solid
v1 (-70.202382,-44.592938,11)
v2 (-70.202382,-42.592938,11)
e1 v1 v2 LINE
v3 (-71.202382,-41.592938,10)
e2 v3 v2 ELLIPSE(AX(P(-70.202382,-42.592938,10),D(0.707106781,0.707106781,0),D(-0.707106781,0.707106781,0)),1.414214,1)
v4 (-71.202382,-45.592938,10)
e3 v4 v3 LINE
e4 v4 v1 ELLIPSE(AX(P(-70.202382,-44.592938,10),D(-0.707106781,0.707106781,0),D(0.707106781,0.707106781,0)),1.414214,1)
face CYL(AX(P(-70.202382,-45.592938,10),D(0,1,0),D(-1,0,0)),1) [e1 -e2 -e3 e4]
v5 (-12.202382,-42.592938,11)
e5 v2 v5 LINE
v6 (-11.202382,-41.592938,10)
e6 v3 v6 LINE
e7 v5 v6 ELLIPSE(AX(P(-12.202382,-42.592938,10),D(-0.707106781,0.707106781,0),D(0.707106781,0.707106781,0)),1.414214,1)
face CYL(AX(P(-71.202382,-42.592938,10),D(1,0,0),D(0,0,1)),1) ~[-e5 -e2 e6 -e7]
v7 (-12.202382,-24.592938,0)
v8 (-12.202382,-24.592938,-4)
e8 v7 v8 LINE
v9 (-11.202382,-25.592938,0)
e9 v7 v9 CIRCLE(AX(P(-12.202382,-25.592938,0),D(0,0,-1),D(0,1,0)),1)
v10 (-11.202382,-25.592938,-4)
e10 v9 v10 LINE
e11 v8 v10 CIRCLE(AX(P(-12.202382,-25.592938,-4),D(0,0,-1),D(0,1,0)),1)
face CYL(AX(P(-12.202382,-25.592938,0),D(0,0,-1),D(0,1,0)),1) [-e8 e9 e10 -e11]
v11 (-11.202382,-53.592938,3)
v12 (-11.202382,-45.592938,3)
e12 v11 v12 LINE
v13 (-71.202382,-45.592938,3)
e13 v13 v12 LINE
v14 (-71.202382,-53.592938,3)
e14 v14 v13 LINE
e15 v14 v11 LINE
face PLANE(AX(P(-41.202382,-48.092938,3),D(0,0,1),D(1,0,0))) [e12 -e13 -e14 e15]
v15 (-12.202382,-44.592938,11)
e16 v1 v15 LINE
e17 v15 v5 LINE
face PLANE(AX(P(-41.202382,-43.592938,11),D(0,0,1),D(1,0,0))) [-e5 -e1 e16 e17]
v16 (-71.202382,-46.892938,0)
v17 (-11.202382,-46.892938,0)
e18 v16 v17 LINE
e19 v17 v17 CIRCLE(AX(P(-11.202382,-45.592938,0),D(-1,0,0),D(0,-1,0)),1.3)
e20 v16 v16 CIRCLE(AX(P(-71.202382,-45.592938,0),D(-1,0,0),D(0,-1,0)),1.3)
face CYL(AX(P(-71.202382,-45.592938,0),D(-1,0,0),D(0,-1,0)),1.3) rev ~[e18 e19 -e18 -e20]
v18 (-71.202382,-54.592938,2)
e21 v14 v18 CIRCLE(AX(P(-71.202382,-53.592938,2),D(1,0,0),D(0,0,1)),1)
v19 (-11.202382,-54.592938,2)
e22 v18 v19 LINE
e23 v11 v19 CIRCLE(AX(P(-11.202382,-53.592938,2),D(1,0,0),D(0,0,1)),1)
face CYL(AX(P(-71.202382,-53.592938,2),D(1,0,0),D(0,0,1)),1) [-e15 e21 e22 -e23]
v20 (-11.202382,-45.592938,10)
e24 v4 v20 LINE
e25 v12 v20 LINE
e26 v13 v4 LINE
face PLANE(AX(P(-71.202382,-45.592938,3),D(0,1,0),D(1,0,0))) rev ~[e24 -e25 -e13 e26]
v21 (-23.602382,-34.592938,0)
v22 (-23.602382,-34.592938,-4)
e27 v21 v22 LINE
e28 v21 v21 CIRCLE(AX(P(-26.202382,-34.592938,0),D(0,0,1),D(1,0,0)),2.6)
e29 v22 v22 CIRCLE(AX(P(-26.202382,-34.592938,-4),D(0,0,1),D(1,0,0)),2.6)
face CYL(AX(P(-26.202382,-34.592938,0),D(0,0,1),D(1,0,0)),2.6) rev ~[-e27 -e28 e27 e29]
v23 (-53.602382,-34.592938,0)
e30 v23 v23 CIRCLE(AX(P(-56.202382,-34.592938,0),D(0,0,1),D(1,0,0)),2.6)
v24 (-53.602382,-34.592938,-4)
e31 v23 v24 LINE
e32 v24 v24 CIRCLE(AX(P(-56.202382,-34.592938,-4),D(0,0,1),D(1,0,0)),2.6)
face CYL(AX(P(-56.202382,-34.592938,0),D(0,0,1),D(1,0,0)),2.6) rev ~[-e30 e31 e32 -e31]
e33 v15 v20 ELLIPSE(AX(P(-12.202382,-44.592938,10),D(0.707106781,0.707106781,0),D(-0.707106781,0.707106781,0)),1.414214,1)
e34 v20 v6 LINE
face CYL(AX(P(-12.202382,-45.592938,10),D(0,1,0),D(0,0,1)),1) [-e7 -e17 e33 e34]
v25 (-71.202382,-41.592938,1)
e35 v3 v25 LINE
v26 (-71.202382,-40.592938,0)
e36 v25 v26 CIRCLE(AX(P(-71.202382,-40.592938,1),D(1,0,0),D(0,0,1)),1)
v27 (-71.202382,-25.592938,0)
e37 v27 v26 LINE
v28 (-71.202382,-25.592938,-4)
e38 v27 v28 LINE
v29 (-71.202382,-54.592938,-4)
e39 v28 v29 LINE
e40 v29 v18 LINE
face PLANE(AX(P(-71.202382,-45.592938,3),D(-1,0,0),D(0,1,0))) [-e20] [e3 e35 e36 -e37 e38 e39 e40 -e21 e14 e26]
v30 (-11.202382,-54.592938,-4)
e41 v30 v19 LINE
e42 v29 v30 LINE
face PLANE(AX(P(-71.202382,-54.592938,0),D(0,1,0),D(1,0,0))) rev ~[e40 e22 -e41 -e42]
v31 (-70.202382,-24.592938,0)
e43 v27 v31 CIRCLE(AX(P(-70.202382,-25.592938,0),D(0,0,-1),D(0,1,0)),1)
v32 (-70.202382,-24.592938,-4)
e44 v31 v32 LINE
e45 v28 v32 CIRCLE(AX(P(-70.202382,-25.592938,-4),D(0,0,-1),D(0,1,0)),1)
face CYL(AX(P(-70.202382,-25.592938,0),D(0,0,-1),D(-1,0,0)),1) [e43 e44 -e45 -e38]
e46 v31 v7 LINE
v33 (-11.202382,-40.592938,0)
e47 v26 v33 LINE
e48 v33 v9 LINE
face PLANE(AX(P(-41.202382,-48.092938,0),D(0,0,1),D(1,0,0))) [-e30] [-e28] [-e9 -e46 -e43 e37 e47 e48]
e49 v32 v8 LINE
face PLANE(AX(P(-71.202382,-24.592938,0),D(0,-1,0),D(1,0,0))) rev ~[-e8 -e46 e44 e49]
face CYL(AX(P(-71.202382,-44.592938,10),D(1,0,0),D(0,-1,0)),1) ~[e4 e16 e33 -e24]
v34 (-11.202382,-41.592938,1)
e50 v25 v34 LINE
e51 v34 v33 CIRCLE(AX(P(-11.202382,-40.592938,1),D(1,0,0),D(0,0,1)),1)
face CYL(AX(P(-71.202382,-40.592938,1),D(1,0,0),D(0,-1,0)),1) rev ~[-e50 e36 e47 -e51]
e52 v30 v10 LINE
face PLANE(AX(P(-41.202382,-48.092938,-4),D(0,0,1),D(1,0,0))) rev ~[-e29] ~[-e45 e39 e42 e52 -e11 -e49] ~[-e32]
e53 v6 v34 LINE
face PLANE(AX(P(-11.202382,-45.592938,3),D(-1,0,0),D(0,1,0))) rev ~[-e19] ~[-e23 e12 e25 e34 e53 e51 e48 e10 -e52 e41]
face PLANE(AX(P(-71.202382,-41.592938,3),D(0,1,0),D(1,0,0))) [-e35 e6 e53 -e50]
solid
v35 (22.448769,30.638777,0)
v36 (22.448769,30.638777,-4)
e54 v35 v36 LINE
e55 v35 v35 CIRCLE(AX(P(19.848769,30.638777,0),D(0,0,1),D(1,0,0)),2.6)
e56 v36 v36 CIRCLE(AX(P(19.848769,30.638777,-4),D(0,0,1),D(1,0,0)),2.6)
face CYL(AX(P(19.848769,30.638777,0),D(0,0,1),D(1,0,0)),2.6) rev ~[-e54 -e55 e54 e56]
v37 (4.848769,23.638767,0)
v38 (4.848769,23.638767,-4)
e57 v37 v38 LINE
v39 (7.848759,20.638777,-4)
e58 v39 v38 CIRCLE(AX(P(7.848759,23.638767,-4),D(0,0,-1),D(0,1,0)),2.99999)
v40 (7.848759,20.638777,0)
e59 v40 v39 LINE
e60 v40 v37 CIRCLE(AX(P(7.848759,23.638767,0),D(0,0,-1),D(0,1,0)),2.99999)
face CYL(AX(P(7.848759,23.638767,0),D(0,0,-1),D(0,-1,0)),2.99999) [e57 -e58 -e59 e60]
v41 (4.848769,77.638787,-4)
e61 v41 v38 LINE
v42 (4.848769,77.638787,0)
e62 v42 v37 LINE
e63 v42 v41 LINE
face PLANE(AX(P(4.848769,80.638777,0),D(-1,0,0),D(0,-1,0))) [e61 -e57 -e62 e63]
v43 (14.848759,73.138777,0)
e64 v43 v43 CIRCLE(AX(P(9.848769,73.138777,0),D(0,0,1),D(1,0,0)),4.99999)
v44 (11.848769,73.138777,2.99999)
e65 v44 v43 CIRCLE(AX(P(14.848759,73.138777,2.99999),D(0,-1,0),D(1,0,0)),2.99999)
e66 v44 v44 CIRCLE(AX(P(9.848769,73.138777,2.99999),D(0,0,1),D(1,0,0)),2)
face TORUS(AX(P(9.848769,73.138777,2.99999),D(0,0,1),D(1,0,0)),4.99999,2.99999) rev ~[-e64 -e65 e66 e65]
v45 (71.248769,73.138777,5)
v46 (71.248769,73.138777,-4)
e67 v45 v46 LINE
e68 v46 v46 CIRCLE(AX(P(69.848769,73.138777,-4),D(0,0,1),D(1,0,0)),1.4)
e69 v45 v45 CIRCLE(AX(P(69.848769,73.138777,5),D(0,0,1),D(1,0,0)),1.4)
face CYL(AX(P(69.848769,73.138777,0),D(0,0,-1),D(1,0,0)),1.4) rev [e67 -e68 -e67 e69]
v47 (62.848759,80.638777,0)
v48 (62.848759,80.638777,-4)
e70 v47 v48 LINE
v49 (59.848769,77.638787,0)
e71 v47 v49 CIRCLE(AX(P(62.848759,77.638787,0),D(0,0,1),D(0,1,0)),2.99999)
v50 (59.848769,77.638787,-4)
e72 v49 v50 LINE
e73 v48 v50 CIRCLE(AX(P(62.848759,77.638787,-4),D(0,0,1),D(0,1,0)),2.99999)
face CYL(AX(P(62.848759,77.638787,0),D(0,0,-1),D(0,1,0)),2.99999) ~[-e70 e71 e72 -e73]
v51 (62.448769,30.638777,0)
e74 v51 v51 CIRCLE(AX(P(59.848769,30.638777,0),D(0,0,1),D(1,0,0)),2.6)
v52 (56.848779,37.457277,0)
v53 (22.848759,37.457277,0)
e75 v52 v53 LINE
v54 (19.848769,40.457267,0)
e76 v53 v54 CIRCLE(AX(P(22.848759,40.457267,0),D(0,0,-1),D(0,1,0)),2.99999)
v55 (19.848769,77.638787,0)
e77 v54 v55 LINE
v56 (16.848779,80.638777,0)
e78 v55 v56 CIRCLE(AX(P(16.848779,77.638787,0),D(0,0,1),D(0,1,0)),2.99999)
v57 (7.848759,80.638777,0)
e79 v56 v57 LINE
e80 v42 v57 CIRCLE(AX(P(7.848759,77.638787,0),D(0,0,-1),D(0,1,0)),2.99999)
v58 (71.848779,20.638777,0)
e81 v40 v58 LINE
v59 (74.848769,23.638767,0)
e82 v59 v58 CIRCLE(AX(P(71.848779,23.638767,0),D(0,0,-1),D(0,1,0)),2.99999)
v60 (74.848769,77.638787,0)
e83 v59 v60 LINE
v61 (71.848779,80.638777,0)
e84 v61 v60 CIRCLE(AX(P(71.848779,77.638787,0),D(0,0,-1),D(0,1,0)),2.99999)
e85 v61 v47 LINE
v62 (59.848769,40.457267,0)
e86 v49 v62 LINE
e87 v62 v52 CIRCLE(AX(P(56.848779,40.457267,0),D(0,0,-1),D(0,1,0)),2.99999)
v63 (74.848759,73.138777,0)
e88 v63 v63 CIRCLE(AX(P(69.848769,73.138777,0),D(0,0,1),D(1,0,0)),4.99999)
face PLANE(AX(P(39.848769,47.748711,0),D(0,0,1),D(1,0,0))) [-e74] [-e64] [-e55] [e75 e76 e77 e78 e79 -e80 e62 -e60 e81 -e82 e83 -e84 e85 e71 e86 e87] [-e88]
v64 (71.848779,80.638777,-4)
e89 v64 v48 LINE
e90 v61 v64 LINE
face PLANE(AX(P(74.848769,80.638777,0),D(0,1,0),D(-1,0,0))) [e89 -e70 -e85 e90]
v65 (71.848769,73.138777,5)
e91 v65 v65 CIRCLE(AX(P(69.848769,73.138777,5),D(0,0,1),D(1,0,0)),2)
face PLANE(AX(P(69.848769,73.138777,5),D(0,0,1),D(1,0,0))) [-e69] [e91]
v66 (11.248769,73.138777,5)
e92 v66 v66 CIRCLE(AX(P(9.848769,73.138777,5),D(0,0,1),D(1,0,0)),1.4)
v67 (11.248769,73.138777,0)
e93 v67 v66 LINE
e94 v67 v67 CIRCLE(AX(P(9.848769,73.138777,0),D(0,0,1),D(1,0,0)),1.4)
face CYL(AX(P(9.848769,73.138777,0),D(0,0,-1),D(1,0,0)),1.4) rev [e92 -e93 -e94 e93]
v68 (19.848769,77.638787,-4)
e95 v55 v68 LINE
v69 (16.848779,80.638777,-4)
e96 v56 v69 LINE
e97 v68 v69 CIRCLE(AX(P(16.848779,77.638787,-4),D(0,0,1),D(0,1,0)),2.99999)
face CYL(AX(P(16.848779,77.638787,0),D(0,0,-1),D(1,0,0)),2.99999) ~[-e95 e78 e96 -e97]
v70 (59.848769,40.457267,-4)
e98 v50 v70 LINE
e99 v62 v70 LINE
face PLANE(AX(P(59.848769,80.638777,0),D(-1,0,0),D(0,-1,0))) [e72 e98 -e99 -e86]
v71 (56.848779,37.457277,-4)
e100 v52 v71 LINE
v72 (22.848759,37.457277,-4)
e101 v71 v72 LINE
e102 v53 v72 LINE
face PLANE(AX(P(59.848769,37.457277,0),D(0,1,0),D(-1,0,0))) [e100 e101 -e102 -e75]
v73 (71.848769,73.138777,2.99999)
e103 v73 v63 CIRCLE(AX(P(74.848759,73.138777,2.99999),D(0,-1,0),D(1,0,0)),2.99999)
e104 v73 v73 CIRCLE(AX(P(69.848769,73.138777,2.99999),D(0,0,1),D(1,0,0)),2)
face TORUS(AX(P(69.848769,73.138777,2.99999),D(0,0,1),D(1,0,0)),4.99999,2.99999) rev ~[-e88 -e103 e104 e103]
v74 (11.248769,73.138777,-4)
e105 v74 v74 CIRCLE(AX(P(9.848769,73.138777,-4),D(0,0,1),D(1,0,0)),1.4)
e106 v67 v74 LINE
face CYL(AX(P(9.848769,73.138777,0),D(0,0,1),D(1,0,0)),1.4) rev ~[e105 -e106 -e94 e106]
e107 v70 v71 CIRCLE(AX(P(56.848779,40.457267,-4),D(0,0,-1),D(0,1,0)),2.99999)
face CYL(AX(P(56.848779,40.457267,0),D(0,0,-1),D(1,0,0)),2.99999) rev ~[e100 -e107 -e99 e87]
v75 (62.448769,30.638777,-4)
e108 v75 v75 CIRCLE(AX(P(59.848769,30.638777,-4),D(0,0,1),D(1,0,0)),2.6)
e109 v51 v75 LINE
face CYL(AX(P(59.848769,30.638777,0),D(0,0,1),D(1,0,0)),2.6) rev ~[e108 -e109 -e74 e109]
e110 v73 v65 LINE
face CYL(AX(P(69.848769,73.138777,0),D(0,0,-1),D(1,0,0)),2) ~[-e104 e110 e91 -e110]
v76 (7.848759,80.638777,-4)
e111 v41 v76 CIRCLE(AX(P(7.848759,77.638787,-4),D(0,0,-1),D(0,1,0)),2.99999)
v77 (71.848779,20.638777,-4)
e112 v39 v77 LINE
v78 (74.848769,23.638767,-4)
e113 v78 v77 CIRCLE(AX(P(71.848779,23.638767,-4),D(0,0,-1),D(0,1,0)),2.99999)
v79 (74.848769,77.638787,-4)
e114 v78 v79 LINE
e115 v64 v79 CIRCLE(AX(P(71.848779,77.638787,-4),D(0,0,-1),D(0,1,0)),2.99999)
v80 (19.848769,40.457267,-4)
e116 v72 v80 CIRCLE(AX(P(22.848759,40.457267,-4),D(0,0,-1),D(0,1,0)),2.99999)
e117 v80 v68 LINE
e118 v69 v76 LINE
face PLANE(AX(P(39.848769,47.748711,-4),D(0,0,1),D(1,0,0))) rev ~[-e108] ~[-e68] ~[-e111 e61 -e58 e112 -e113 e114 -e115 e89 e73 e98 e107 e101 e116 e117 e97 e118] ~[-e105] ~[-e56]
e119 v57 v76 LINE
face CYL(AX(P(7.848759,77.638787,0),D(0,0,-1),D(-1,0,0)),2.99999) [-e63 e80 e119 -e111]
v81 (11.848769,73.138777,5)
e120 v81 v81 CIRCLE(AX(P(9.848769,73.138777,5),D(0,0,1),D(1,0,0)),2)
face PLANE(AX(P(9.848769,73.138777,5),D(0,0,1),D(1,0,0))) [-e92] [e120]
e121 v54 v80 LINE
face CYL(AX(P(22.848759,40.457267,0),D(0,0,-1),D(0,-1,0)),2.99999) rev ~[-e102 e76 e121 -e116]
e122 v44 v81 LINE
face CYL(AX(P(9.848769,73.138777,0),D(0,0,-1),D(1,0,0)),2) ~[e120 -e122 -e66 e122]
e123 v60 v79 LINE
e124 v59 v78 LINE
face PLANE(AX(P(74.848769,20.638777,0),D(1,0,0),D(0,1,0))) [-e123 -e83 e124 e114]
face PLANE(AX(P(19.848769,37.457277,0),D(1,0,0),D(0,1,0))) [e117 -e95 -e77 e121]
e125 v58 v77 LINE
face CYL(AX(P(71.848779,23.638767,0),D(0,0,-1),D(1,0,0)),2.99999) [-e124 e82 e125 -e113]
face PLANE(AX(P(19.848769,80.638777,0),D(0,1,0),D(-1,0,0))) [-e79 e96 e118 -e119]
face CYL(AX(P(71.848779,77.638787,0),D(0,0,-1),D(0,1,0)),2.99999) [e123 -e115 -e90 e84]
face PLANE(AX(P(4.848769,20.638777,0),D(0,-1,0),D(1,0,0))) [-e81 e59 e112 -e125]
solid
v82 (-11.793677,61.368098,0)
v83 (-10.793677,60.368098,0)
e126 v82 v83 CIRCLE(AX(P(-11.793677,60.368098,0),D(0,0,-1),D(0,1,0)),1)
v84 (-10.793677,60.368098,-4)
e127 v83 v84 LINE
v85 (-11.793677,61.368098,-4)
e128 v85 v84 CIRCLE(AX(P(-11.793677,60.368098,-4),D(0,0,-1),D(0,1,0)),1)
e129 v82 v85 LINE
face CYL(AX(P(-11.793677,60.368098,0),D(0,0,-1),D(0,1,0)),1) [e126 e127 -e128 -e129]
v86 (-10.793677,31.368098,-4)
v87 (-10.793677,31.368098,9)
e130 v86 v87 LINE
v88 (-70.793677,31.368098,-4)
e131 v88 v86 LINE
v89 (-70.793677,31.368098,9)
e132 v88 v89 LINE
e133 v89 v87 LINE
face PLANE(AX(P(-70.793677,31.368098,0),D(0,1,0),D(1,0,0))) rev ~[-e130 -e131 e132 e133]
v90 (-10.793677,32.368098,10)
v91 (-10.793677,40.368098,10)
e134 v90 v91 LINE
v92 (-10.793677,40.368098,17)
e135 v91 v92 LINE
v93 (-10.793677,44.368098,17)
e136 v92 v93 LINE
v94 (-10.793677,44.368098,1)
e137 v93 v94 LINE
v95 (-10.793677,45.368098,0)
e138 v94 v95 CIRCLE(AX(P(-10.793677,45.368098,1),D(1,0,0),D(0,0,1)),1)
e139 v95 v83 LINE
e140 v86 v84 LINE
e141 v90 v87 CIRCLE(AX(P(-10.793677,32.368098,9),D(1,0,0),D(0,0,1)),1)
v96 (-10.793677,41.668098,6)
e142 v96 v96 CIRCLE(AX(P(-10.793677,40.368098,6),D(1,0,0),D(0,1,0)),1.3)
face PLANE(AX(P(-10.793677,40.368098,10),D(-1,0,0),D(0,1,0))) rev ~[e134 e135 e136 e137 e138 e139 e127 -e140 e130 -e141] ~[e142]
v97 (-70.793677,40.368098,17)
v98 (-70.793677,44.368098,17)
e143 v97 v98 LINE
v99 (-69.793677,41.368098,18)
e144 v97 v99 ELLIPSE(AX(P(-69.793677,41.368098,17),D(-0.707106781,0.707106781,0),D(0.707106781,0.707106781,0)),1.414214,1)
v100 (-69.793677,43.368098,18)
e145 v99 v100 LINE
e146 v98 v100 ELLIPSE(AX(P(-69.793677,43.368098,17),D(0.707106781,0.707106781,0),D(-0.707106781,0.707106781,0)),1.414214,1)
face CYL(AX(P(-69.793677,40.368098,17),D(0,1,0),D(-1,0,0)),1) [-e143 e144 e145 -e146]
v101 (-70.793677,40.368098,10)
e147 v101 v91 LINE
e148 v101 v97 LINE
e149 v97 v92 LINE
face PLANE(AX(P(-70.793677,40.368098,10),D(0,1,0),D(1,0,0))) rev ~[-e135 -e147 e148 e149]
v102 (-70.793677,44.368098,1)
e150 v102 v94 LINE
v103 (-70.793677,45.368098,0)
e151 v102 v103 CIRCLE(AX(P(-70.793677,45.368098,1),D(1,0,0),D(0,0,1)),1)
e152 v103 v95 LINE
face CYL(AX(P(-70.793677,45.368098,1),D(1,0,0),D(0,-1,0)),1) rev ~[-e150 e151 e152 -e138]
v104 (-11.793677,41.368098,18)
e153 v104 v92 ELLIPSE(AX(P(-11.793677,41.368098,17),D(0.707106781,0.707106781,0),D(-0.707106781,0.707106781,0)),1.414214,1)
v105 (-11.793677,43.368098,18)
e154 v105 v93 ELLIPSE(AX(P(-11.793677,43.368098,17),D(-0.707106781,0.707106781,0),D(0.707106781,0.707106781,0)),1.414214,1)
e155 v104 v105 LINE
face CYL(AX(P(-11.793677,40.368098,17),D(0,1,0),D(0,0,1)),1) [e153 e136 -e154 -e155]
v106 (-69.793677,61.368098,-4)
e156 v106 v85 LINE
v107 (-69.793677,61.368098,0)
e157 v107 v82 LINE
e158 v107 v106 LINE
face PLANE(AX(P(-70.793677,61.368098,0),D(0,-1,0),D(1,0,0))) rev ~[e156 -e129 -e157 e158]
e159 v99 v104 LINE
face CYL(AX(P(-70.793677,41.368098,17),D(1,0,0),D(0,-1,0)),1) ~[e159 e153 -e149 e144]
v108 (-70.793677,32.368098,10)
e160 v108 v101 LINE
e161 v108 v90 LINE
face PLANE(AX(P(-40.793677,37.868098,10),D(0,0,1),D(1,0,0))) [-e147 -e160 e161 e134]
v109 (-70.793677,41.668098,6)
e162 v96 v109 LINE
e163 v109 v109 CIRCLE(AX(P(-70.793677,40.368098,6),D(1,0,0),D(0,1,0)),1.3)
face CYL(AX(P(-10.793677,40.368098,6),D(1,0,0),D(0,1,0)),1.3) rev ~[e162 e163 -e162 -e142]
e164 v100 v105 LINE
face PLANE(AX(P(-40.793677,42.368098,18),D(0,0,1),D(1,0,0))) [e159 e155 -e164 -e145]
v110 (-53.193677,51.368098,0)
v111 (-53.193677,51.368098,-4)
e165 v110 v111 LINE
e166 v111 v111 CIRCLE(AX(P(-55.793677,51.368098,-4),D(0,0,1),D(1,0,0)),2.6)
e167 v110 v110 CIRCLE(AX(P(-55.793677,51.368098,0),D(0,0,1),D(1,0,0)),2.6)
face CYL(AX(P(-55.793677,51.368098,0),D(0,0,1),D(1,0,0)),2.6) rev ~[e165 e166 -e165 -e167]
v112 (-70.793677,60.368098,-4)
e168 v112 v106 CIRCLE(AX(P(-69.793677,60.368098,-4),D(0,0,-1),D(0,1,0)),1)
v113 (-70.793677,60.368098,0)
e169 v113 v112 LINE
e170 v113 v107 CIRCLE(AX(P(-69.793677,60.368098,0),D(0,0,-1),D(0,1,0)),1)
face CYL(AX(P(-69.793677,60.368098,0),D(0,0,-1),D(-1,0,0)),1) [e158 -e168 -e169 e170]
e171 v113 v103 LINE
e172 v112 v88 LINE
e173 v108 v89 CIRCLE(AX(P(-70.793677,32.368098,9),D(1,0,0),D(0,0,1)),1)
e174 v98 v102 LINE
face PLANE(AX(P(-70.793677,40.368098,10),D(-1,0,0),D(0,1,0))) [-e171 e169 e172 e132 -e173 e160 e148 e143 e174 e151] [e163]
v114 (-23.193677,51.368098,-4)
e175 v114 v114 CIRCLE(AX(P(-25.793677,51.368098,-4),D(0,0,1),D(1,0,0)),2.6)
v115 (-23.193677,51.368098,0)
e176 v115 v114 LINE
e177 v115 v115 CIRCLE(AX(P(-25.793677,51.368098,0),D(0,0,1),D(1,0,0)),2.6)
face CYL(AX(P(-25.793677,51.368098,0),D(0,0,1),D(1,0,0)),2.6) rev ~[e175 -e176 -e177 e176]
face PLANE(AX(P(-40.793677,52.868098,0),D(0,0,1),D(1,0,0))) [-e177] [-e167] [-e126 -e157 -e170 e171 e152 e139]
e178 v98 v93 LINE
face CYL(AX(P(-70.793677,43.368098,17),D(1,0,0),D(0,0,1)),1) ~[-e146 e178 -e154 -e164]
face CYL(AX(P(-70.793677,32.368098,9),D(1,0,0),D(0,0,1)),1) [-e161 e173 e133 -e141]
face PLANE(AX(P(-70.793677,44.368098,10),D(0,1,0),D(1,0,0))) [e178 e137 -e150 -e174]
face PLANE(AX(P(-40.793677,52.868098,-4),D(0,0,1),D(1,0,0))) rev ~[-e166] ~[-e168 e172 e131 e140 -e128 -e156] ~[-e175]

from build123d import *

# Parameters (mm, degrees)
F0_W      = 60
F0_H      = 17
F0_R      = 2.6
F0_H_2    = 13
F1_DEPTH  = 4
F2_DEPTH  = 10
F3_W      = 60
F3_H      = 4
F4_DEPTH  = 8
F5_R      = 1.3
F6_DEPTH  = 60.001
F7_R      = 1
F8_W      = 60
F8_H      = 13
F8_H_2    = 17
F8_R      = 2.6
F9_DEPTH  = 4
F10_DEPTH = 3
F11_W     = 60
F11_H     = 4
F12_DEPTH = 8
F13_R     = 1.3
F14_DEPTH = 60.40970592
F15_R     = 1
F16_R     = 2.6
F16_R_2   = 2
F16_R_3   = 1.4
F17_DEPTH = 4
F18_DEPTH = 5
F19_R     = 2.99999


# Not quite as in the source:
# - a fillet or chamfer is up to 0.001 mm smaller than in the source, because OpenCascade refuses the exact size


with BuildPart() as f1:
    # F0 (on Top) → F1 (new body)
    with BuildSketch(Plane.XY):
        with Locations((-40.7936765254, 52.8680981398)):
            Rectangle(F0_W, F0_H)
        with Locations((-55.7936765254, 51.3680981398)):
            Circle(F0_R, mode=Mode.SUBTRACT)
        with Locations((-25.7936765254, 51.3680981398)):
            Circle(F0_R, mode=Mode.SUBTRACT)
        with Locations((-40.7936765254, 37.8680981398)):
            Rectangle(F0_W, F0_H_2)
    extrude(amount=-F1_DEPTH)

    # F0 (on Top) → F2 (join)
    with BuildSketch(Plane.XY):
        with Locations((-40.7936765254, 37.8680981398)):
            Rectangle(F0_W, F0_H_2)
    extrude(amount=F2_DEPTH)

    # F3 (on face) → F4 (join)
    with BuildSketch(Plane.XY.offset(10)):
        with Locations((-40.7936765254, 42.3680981398)):
            Rectangle(F3_W, F3_H)
    extrude(amount=F4_DEPTH)

    # F5 (on face) → F6 (cut, through all)
    with BuildSketch(Plane.YZ.offset(-10.7936765254)):
        with Locations((40.3680981398, 6)):
            Circle(F5_R)
    extrude(amount=-F6_DEPTH, mode=Mode.SUBTRACT)

    # F7
    f7_edges = [f1.edges().sort_by_distance(p)[0] for p in [
        (-40.793677, 44.368098, 0),
        (-70.793677, 61.368098, -2),
        (-10.793677, 61.368098, -2),
        (-10.793677, 42.368098, 18),
        (-70.793677, 42.368098, 18),
        (-40.793677, 40.368098, 18),
        (-40.793677, 44.368098, 18),
        (-40.793677, 31.368098, 10),
    ]]
    fillet(f7_edges, radius=F7_R)


with BuildPart() as f9:
    # F8 (on Top) → F9 (new body)
    with BuildSketch(Plane.XY):
        with Locations((-41.2023824453, -48.0929382443)):
            Rectangle(F8_W, F8_H)
        with Locations((-41.2023824453, -33.0929382443)):
            Rectangle(F8_W, F8_H_2)
        with Locations((-56.2023824453, -34.5929382443)):
            Circle(F8_R, mode=Mode.SUBTRACT)
        with Locations((-26.2023824453, -34.5929382443)):
            Circle(F8_R, mode=Mode.SUBTRACT)
    extrude(amount=-F9_DEPTH)

    # F8 (on Top) → F10 (join)
    with BuildSketch(Plane.XY):
        with Locations((-41.2023824453, -48.0929382443)):
            Rectangle(F8_W, F8_H)
    extrude(amount=F10_DEPTH)

    # F11 (on face) → F12 (join)
    with BuildSketch(Plane.XY.offset(3)):
        with Locations((-41.2023824453, -43.5929382443)):
            Rectangle(F11_W, F11_H)
    extrude(amount=F12_DEPTH)

    # F13 (on face) → F14 (cut, through all)
    with BuildSketch(Plane(origin=(-71.2023824453, 0, 0), x_dir=(0, -1, 0), z_dir=(-1, 0, 0))):
        with Locations((45.5929382443, 0)):
            Circle(F13_R)
    extrude(amount=-F14_DEPTH, mode=Mode.SUBTRACT)

    # F15
    f15_edges = [f9.edges().sort_by_distance(p)[0] for p in [
        (-41.202382, -41.592938, 0),
        (-71.202382, -24.592938, -2),
        (-11.202382, -24.592938, -2),
        (-11.202382, -43.592938, 11),
        (-71.202382, -43.592938, 11),
        (-41.202382, -45.592938, 11),
        (-41.202382, -41.592938, 11),
        (-41.202382, -54.592938, 3),
    ]]
    fillet(f15_edges, radius=F15_R)


with BuildPart() as f17:
    # F16 (on Top) → F17 (new body)
    with BuildSketch(Plane.XY):
        Polygon((19.8487690091, 80.6387767196), (4.8487690091, 80.6387767196), (4.8487690091, 20.6387767196), (74.8487690091, 20.6387767196), (74.8487690091, 80.6387767196), (59.8487690091, 80.6387767196), (59.8487690091, 37.4572774023), (19.8487690091, 37.4572774023), align=None)
        with Locations((19.8487690091, 30.6387767196)):
            Circle(F16_R, mode=Mode.SUBTRACT)
        with Locations((59.8487690091, 30.6387767196)):
            Circle(F16_R, mode=Mode.SUBTRACT)
        with Locations((9.8487690091, 73.1387767196)):
            Circle(F16_R_2, mode=Mode.SUBTRACT)
        with Locations((69.8487690091, 73.1387767196)):
            Circle(F16_R_2, mode=Mode.SUBTRACT)
        with Locations((9.8487690091, 73.1387767196)):
            Circle(F16_R_2)
        with Locations((9.8487690091, 73.1387767196)):
            Circle(F16_R_3, mode=Mode.SUBTRACT)
        with Locations((69.8487690091, 73.1387767196)):
            Circle(F16_R_2)
        with Locations((69.8487690091, 73.1387767196)):
            Circle(F16_R_3, mode=Mode.SUBTRACT)
    extrude(amount=-F17_DEPTH)

    # F16 (on Top) → F18 (join)
    with BuildSketch(Plane.XY):
        with Locations((69.8487690091, 73.1387767196)):
            Circle(F16_R_2)
        with Locations((69.8487690091, 73.1387767196)):
            Circle(F16_R_3, mode=Mode.SUBTRACT)
        with Locations((9.8487690091, 73.1387767196)):
            Circle(F16_R_2)
        with Locations((9.8487690091, 73.1387767196)):
            Circle(F16_R_3, mode=Mode.SUBTRACT)
    extrude(amount=F18_DEPTH)

    # F19 (radius 3 in the source; OpenCascade refuses exactly that, so slightly less here)
    f19_edges = [f17.edges().sort_by_distance(p)[0] for p in [
        (4.848769, 80.638777, -2),
        (19.848769, 80.638777, -2),
        (59.848769, 80.638777, -2),
        (74.848769, 80.638777, -2),
        (19.848769, 37.457277, -2),
        (59.848769, 37.457277, -2),
        (4.848769, 20.638777, -2),
        (74.848769, 20.638777, -2),
        (7.848769, 73.138777, 0),
        (67.848769, 73.138777, 0),
    ]]
    fillet(f19_edges, radius=F19_R)


solid = Compound([f1.part, f9.part, f17.part])
